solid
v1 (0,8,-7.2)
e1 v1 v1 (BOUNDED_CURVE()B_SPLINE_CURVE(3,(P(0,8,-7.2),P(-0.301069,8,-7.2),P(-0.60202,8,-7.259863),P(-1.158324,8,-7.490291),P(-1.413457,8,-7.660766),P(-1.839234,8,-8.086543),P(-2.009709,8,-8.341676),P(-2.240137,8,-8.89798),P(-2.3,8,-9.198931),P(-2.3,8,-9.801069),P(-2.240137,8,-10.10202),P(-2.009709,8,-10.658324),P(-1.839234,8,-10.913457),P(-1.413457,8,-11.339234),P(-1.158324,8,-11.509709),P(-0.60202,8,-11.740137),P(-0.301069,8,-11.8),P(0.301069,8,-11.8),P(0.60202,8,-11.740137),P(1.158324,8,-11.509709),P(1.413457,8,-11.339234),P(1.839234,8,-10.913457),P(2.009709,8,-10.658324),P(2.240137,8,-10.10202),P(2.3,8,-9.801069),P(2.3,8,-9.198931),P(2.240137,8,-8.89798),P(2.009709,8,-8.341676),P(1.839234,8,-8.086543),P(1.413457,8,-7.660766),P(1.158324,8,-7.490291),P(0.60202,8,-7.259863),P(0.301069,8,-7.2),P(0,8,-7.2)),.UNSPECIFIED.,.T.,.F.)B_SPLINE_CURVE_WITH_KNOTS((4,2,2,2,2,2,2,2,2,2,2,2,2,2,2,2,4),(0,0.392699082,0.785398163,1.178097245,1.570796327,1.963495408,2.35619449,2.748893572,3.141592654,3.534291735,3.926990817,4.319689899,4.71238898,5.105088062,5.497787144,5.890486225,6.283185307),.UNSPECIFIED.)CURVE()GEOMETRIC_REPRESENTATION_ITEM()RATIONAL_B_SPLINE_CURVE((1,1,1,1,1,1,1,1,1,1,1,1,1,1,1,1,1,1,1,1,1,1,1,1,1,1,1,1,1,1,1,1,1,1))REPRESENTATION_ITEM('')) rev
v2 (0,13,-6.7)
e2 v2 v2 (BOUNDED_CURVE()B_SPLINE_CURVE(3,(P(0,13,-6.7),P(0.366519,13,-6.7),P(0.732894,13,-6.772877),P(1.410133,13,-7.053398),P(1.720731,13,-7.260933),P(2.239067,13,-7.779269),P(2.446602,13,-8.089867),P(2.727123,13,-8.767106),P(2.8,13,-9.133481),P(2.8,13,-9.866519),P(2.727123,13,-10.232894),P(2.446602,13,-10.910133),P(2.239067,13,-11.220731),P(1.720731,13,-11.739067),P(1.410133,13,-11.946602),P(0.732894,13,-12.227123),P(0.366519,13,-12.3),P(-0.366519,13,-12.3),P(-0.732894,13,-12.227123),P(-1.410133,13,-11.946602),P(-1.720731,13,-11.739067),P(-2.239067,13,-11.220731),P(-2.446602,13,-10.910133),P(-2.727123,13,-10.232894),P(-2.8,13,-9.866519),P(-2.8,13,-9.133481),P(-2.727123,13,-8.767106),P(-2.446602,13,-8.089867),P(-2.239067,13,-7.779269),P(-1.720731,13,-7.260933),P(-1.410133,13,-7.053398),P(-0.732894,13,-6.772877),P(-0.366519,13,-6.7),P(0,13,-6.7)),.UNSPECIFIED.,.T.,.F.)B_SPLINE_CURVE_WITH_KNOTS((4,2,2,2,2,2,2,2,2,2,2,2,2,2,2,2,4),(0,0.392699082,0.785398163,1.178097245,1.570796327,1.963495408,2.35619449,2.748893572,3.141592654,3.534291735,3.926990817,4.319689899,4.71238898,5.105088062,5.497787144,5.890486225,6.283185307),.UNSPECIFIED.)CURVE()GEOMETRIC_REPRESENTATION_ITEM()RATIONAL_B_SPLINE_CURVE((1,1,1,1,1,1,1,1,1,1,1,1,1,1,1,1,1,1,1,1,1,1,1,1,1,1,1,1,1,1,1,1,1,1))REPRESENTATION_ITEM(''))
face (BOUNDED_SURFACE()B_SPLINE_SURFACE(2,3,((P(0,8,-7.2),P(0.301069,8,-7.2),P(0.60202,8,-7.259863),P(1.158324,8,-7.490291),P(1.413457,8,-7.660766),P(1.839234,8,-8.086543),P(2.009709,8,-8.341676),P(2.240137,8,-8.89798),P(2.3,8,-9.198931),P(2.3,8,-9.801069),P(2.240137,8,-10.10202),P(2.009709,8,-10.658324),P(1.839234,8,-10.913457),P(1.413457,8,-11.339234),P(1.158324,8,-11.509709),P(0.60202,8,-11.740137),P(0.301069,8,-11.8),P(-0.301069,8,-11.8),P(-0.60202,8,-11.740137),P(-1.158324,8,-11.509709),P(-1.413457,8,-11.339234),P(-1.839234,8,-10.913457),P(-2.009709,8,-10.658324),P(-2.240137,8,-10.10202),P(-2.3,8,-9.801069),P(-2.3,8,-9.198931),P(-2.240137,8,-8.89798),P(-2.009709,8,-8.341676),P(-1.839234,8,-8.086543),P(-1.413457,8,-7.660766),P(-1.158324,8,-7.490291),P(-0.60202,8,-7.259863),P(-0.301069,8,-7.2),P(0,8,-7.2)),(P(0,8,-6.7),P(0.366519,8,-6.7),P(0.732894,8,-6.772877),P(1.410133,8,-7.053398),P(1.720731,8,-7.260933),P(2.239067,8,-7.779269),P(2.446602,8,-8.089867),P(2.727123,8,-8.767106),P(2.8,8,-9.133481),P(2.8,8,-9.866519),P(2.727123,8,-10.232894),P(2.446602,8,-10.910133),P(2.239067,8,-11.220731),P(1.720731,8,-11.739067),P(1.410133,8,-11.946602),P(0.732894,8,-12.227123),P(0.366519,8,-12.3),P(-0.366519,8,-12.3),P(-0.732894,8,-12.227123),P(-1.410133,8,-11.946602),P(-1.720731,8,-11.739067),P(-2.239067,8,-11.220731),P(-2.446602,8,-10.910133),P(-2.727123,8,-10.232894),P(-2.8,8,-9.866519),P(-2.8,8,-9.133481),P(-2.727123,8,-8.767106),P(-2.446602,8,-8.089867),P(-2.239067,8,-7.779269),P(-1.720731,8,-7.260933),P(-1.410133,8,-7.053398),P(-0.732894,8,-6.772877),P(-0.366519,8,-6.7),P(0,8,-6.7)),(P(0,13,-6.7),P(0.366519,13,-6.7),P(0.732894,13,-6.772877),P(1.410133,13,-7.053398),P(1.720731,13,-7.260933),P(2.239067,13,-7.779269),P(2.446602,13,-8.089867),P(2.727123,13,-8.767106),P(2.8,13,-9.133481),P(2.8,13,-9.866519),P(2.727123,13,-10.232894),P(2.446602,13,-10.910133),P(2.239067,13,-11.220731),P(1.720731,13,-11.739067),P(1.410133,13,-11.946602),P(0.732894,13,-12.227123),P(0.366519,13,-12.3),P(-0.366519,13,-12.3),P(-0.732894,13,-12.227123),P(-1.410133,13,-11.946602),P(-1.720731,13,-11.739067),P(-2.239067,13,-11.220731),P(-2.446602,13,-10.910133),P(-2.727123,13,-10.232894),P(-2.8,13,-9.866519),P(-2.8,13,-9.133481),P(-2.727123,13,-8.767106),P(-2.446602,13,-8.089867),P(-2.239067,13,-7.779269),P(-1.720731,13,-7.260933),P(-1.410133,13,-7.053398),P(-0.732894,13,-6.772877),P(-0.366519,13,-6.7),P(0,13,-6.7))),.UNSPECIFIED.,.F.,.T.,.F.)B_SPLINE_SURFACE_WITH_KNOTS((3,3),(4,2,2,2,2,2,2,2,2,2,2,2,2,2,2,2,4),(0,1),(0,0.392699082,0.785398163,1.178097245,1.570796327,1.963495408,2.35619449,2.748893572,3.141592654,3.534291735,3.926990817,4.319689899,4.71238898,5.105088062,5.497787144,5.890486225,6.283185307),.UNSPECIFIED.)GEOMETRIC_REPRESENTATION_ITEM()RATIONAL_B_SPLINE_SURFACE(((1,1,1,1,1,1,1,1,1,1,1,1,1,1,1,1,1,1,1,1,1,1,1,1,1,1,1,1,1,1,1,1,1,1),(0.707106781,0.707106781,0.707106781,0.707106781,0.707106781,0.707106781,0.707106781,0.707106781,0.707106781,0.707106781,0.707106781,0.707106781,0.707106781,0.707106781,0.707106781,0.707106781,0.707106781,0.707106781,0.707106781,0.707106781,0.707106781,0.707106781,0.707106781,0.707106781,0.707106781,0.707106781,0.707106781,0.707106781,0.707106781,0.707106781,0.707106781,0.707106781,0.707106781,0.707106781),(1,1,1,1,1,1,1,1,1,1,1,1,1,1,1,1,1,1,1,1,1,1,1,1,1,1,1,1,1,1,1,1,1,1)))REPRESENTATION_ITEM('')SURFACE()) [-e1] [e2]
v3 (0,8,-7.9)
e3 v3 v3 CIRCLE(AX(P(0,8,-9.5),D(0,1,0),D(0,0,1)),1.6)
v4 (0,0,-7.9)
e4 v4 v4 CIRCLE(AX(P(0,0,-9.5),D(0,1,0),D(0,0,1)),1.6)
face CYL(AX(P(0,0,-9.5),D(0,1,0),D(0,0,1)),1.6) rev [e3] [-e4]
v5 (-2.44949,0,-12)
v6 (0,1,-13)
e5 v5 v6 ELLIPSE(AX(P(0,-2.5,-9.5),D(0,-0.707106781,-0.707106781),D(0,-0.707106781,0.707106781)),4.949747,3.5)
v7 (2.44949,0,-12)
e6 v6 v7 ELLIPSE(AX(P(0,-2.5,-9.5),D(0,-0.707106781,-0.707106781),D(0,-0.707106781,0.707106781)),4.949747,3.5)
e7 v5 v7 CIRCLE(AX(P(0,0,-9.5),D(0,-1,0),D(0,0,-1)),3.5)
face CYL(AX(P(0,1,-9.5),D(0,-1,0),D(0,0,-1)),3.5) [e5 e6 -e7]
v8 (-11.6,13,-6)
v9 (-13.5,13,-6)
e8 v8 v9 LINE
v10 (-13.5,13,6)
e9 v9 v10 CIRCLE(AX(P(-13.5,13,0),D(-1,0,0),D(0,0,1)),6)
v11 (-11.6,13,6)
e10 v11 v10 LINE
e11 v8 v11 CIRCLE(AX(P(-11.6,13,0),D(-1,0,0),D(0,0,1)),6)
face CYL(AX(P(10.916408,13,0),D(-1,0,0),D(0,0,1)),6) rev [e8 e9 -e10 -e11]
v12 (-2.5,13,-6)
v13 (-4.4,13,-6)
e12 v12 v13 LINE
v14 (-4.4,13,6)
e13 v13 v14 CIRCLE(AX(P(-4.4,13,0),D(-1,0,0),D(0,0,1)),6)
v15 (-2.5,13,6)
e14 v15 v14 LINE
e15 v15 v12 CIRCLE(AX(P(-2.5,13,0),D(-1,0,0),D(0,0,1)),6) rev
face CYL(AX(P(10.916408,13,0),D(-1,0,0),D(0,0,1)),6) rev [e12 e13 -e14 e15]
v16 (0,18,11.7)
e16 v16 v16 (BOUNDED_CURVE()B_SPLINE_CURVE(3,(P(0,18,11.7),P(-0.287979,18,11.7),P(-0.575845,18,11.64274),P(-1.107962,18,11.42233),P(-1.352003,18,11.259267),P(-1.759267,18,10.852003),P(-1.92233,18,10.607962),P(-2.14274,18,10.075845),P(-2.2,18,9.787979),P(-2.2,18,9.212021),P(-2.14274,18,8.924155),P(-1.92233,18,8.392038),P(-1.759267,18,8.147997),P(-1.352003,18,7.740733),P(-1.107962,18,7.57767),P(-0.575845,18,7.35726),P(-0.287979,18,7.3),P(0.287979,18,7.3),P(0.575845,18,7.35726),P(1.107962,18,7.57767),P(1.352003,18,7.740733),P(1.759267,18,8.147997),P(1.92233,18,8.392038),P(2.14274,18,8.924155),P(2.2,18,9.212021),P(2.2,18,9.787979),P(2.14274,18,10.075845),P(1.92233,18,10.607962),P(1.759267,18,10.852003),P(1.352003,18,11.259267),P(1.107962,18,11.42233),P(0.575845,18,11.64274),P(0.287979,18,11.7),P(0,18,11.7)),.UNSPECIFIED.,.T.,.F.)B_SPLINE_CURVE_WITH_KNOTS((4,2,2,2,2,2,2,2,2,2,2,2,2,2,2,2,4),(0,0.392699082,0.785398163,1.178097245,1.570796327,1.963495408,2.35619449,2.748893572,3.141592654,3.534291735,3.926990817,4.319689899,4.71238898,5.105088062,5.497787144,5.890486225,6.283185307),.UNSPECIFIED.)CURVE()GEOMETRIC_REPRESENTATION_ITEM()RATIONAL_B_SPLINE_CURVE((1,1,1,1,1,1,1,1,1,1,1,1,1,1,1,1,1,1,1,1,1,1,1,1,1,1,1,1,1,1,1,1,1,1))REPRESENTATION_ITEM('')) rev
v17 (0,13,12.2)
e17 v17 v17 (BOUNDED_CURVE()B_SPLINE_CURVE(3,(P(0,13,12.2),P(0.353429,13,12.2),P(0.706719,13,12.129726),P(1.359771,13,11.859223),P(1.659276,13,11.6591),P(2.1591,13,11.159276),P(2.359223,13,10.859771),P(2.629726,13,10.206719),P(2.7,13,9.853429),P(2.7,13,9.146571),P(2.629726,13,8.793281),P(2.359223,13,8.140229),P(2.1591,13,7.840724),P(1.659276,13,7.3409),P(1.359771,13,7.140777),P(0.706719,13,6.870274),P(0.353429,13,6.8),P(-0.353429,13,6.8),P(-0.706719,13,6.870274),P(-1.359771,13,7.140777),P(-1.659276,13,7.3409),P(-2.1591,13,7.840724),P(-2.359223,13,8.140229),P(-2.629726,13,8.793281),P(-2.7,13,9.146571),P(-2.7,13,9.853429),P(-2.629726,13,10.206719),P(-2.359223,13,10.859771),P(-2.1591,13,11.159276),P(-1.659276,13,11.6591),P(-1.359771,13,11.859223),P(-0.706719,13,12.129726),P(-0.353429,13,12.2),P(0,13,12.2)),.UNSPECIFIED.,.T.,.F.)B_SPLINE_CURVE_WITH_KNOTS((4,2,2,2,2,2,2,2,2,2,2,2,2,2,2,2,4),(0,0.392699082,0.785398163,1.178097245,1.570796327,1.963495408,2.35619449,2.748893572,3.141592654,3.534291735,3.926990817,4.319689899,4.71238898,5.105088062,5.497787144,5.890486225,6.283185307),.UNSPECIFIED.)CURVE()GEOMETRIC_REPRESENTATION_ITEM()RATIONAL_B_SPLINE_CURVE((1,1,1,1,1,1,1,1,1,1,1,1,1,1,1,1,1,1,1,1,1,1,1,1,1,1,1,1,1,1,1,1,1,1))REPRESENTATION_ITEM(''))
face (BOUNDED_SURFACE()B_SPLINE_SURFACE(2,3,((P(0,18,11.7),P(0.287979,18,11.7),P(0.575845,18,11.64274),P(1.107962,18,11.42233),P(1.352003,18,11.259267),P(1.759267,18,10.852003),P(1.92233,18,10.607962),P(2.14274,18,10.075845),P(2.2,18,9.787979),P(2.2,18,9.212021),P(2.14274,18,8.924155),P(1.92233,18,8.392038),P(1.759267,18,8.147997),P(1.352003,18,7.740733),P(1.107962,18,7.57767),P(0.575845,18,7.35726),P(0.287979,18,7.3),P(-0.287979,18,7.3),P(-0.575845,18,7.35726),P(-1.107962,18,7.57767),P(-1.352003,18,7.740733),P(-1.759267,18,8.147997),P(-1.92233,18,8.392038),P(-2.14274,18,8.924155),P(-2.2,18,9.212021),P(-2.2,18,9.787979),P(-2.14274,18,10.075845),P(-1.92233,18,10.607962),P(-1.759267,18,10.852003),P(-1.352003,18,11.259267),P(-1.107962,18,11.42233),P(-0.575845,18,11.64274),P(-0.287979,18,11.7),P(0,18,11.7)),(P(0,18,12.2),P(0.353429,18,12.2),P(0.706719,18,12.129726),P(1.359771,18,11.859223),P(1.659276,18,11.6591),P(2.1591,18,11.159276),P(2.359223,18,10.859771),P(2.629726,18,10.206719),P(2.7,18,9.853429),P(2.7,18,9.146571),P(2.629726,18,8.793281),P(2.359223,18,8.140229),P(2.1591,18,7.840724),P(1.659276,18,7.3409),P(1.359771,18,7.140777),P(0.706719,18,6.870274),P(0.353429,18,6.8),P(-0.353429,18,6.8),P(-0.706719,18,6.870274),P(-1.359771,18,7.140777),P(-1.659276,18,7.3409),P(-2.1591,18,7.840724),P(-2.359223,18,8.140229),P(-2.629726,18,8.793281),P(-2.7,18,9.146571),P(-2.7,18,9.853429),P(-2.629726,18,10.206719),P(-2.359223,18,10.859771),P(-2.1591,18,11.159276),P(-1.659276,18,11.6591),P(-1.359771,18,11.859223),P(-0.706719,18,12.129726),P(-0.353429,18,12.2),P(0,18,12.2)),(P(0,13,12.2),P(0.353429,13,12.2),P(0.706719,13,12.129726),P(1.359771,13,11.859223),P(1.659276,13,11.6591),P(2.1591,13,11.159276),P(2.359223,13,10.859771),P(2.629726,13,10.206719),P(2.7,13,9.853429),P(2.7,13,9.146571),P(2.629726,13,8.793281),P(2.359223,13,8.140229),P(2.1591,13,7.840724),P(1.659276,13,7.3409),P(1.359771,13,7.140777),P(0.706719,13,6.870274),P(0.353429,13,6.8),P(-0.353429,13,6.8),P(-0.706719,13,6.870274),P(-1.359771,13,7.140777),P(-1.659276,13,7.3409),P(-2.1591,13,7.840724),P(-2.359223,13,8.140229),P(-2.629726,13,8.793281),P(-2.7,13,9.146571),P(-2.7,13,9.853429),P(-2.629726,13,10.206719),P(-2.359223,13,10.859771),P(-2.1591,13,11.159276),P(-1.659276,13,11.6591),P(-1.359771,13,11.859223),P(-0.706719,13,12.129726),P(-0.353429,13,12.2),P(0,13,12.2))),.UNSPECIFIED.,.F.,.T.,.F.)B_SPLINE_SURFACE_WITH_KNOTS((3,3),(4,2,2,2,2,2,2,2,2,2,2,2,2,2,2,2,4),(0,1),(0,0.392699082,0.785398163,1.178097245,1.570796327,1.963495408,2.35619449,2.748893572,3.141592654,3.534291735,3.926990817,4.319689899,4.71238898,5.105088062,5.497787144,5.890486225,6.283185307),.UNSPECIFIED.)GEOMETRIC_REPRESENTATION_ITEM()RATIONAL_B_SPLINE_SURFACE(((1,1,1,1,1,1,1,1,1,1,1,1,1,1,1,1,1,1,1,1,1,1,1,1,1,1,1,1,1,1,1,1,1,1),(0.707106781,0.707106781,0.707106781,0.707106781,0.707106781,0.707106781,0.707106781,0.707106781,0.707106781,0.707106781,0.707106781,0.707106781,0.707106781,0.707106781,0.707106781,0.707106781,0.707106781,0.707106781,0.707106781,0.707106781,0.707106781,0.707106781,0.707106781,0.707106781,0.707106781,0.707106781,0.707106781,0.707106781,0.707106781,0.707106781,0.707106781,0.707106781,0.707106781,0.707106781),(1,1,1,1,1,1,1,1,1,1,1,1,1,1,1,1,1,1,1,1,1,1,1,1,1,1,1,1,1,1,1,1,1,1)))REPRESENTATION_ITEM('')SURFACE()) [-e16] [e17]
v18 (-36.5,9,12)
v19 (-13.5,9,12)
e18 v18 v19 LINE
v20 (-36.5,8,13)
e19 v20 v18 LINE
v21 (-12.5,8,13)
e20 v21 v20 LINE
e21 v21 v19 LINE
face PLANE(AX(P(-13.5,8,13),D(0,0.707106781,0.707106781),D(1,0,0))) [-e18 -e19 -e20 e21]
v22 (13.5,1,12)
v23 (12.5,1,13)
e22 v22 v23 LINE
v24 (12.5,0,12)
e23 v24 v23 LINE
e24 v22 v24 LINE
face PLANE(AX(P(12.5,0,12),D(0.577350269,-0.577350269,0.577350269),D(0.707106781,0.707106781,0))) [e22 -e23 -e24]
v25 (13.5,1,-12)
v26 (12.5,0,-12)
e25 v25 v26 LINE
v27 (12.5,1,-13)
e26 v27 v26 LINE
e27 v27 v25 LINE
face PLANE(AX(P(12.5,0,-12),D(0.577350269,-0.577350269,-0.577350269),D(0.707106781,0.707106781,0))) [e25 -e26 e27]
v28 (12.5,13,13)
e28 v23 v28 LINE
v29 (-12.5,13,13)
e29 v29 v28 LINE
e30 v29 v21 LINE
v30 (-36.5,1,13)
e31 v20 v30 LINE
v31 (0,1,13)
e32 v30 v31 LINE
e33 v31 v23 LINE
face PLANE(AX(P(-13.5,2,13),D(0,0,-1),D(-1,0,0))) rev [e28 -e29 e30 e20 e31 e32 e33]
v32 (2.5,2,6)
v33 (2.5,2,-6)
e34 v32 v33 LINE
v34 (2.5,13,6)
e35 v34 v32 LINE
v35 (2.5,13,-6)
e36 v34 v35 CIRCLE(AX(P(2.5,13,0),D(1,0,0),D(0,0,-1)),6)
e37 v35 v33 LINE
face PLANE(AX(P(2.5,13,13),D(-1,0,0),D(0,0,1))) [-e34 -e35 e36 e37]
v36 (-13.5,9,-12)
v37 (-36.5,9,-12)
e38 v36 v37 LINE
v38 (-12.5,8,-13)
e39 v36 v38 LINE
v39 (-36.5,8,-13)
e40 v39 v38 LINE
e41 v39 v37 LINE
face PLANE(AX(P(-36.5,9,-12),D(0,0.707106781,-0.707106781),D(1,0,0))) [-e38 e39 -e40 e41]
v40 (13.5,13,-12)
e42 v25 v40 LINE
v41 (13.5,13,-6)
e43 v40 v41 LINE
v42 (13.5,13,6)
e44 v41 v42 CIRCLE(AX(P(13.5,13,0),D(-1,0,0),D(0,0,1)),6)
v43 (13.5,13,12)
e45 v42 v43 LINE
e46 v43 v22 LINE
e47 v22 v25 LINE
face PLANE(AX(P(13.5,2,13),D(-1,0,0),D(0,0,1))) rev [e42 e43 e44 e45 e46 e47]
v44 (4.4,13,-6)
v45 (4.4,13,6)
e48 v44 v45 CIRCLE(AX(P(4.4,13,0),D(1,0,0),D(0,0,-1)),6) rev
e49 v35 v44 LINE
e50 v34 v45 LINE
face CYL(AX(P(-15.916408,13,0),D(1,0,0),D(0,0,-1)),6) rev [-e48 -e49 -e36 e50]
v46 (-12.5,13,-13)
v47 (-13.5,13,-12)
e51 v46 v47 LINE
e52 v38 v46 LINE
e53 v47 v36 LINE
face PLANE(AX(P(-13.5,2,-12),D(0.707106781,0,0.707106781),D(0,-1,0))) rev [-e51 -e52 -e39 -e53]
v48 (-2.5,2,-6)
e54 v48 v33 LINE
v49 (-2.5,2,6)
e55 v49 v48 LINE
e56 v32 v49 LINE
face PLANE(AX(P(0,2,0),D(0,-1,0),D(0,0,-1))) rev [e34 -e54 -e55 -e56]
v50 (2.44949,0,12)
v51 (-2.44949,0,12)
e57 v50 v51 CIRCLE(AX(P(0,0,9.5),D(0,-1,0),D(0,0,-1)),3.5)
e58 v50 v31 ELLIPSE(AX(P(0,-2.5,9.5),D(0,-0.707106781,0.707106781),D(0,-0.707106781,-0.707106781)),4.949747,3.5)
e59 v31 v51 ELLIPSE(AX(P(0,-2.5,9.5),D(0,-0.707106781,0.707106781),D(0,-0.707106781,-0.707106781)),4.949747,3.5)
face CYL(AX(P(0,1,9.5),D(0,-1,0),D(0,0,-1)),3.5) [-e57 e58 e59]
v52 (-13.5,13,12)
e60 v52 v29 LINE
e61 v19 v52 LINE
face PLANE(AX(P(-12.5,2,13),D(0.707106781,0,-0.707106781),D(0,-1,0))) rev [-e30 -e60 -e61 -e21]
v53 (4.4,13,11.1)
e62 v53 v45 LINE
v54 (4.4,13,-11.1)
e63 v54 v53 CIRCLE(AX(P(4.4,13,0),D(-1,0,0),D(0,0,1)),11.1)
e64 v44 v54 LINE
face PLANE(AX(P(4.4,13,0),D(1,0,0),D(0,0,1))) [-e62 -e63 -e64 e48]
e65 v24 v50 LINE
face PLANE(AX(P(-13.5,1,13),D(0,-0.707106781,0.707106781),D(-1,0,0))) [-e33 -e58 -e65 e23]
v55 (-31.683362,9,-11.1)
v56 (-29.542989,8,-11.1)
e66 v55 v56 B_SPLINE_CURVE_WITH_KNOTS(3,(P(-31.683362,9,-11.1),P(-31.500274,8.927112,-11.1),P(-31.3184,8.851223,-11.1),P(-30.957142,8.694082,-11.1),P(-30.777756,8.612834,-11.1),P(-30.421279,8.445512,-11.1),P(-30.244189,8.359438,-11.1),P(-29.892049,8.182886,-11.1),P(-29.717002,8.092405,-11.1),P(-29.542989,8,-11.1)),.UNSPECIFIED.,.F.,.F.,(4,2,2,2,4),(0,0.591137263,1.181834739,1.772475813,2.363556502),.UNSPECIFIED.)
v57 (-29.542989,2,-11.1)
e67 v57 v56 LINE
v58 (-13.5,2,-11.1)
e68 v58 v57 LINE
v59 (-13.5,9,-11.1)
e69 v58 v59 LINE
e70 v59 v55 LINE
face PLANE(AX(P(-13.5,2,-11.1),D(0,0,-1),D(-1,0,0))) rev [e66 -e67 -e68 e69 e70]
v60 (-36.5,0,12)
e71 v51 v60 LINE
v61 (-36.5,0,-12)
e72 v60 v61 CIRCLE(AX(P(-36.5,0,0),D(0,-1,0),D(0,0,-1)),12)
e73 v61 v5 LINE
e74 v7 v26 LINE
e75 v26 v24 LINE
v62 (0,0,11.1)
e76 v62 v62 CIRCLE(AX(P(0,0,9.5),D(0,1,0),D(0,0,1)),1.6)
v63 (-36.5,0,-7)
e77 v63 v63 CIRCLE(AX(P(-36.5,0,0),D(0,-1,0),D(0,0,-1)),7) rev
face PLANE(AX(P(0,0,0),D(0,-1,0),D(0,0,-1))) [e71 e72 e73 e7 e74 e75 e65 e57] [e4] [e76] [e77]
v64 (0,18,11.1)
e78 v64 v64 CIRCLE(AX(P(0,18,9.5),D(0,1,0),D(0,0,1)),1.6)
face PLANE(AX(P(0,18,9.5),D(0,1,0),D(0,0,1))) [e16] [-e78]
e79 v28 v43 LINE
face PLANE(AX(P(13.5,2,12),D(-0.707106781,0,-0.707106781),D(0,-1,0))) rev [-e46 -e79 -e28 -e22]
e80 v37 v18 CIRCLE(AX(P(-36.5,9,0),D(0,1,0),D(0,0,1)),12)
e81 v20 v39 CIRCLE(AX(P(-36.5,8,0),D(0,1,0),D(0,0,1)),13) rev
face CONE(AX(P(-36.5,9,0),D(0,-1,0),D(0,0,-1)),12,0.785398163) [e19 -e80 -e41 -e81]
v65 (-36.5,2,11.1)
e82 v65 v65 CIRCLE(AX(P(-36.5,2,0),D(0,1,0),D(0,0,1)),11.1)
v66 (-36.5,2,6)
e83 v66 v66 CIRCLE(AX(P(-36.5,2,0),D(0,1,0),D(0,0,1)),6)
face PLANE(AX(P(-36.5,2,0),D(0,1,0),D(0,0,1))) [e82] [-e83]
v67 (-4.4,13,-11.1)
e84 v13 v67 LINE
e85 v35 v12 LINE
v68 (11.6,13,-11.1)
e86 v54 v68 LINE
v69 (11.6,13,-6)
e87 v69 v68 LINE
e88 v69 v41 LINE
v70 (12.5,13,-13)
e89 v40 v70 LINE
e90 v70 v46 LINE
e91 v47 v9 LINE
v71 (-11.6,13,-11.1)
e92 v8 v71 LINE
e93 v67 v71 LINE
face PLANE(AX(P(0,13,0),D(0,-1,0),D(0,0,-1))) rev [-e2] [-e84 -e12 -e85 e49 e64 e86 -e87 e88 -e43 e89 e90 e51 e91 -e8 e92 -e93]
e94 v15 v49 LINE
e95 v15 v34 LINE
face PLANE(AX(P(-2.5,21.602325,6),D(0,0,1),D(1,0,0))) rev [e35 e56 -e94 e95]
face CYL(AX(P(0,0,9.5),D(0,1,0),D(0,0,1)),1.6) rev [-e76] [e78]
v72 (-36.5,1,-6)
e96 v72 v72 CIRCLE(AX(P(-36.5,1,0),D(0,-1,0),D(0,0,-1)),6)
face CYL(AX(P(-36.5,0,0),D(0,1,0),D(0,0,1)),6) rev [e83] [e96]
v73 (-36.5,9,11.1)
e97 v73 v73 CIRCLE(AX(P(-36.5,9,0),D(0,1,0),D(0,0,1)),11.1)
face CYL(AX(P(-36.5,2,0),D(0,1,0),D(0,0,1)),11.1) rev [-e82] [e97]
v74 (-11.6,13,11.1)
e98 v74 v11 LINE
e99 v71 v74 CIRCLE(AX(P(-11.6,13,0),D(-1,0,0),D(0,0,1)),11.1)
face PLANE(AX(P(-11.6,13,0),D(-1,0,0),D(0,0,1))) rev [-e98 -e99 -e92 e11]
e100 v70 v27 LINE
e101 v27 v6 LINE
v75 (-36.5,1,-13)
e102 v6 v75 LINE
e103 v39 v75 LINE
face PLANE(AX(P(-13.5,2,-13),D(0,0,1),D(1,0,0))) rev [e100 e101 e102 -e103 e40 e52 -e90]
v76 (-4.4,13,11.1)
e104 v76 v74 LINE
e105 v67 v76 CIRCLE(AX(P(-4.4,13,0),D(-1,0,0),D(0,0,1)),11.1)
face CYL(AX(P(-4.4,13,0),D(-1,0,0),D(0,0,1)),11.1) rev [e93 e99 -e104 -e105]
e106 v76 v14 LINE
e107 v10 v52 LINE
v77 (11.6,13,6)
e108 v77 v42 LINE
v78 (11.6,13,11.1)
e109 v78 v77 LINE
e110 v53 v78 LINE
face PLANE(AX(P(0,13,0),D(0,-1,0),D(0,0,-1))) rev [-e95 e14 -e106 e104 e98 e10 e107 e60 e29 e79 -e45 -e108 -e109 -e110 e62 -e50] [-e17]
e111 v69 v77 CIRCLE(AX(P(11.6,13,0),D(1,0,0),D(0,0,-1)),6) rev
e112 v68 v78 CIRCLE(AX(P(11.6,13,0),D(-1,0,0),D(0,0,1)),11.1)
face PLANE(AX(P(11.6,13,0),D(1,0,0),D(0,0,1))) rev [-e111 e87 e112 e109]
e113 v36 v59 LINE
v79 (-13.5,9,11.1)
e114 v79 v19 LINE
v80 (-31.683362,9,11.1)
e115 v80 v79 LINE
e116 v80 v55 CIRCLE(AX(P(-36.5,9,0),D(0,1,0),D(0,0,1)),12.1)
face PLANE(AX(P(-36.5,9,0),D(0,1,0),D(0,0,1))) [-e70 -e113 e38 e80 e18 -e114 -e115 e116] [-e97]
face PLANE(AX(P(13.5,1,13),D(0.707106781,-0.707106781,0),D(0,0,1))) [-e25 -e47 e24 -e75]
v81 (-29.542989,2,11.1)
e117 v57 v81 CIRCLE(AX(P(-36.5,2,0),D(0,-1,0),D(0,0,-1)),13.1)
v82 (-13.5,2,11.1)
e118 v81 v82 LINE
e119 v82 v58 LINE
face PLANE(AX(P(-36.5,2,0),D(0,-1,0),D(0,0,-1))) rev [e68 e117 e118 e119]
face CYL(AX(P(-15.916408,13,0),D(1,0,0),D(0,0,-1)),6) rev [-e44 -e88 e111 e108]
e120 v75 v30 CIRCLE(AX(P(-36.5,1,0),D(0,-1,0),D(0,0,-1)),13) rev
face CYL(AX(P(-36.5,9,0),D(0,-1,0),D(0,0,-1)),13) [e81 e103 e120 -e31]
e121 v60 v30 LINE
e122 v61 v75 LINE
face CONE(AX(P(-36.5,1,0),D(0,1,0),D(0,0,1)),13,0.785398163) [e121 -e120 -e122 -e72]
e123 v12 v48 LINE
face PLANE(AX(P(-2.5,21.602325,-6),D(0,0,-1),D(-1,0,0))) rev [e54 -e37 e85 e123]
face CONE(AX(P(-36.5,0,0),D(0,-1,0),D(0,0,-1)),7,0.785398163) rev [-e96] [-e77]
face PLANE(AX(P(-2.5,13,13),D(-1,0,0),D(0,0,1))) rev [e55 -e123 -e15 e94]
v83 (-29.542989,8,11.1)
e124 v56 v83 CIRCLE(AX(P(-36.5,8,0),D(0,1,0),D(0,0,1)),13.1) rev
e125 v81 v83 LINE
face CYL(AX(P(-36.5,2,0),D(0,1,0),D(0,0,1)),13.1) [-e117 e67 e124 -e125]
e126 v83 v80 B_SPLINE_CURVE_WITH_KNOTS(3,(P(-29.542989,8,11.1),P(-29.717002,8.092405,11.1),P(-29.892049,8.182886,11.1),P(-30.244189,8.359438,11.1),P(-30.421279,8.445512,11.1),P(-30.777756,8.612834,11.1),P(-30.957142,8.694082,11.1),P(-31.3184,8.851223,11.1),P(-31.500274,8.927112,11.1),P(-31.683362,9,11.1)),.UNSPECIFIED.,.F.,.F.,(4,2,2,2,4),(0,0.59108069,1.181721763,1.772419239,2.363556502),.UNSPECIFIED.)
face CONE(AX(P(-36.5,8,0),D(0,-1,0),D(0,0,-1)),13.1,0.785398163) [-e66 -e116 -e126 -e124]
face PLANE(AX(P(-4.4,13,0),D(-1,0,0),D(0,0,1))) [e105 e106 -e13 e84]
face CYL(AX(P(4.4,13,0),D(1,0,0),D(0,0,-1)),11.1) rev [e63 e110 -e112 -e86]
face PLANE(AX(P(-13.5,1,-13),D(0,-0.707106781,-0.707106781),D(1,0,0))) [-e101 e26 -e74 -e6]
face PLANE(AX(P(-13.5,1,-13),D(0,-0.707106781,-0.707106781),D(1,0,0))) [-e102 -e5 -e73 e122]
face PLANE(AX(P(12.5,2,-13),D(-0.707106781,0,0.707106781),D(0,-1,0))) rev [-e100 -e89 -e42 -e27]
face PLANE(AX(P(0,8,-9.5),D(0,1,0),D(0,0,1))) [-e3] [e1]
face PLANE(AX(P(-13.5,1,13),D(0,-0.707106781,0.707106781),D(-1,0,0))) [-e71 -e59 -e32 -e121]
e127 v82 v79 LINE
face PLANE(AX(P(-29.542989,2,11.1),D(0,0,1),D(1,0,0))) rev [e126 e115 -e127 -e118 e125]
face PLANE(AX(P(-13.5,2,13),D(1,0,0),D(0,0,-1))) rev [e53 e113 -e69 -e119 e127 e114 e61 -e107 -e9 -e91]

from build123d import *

# Parameters (mm, degrees)
SKETCH1_W           = 27
SKETCH1_H           = 26
BOSS_EXTRUDE1_DEPTH = 2
SKETCH2_W           = 11
SKETCH2_H           = 26
BOSS_EXTRUDE2_DEPTH = 11
CUT_EXTRUDE1_DEPTH  = 3.6
CUT_EXTRUDE2_REACH  = 34.665
SKETCH13_W          = 5
SKETCH13_H          = 7
BOSS_EXTRUDE6_DEPTH = 11
SKETCH14_R          = 2.7
BOSS_EXTRUDE7_DEPTH = 5
SKETCH15_R          = 2.8
CUT_EXTRUDE7_DEPTH  = 5
SKETCH16_R          = 1.6
CUT_EXTRUDE8_DEPTH  = 26.98557292
BOSS_EXTRUDE5_DEPTH = 9
SKETCH10_R          = 11.1
CUT_EXTRUDE4_DEPTH  = 7
SKETCH11_R          = 6
CUT_EXTRUDE5_DEPTH  = 54.621357685
CUT_EXTRUDE6_DEPTH  = 7
BOSS_EXTRUDE9_START = -1
SKETCH17_R          = 3.5
SKETCH17_R_2        = 1.6
BOSS_EXTRUDE9_DEPTH = 1
FILLET1_SIZE        = 5
FILLET1_SIZE_2      = 0.5


with BuildPart() as part:
    # Sketch1 → Boss-Extrude1 (new body)
    with BuildSketch(Plane(origin=(0, 0, 0), x_dir=(1, 0, 0), z_dir=(0, 1, 0))):
        Rectangle(SKETCH1_W, SKETCH1_H)
    extrude(amount=BOSS_EXTRUDE1_DEPTH)

    # Sketch2 → Boss-Extrude2 (add)
    with BuildSketch(Plane(origin=(0, 2, 0), x_dir=(1, 0, 0), z_dir=(0, 1, 0))):
        with Locations((-8, 0)):
            Rectangle(SKETCH2_W, SKETCH2_H)
    boss_extrude2 = extrude(amount=BOSS_EXTRUDE2_DEPTH)

    # Sketch3 → Cut-Extrude1 (cut, symmetric)
    with BuildSketch(Plane.ZY.offset(8)):
        with BuildLine():
            Line((11.1, 13), (-11.1, 13))
            ThreePointArc((-11.1, 13), (0, 1.9), (11.1, 13))
        make_face()
    cut_extrude1 = extrude(amount=CUT_EXTRUDE1_DEPTH, both=True, mode=Mode.SUBTRACT)

    # Cut-Extrude2: up to this face of the body (flat: up to its plane)
    cut_extrude2_end = Plane(part.part.faces().sort_by_distance((-2.5, 7.5, 0))[0])
    # Sketch4 → Cut-Extrude2 (cut, up to the picked face)
    with BuildSketch(Plane.ZY.offset(13.5), mode=Mode.PRIVATE) as cut_extrude2_sk1:
        with BuildLine():
            Line((6, 13), (-6, 13))
            ThreePointArc((-6, 13), (0, 7), (6, 13))
        make_face()
    cut_extrude2_tool1 = split(extrude(cut_extrude2_sk1.sketch, amount=-CUT_EXTRUDE2_REACH, mode=Mode.PRIVATE), bisect_by=cut_extrude2_end, keep=Keep.BOTH, mode=Mode.PRIVATE)
    cut_extrude2 = cut_extrude2_tool1.solids().sort_by(Axis((-13.5, 10.453521, 0), (1, 0, 0)))[0]
    add(cut_extrude2, mode=Mode.SUBTRACT)

    # Mirror3: Boss-Extrude2, Cut-Extrude1, Cut-Extrude2 across plane
    add(boss_extrude2.mirror(Plane(origin=(0, 0, 0), x_dir=(0, 0, 1), z_dir=(1, 0, 0))))
    add(cut_extrude1.mirror(Plane(origin=(0, 0, 0), x_dir=(0, 0, 1), z_dir=(1, 0, 0))), mode=Mode.SUBTRACT)
    add(cut_extrude2.mirror(Plane(origin=(0, 0, 0), x_dir=(0, 0, 1), z_dir=(1, 0, 0))), mode=Mode.SUBTRACT)

    # Sketch13 → Boss-Extrude6 (add)
    with BuildSketch(Plane(origin=(0, 2, 0), x_dir=(1, 0, 0), z_dir=(0, 1, 0))):
        with Locations((0, -9.5)):
            Rectangle(SKETCH13_W, SKETCH13_H)
        with Locations((0, 9.5)):
            Rectangle(SKETCH13_W, SKETCH13_H)
    extrude(amount=BOSS_EXTRUDE6_DEPTH)

    # Sketch14 → Boss-Extrude7 (add)
    with BuildSketch(Plane(origin=(0, 13, 0), x_dir=(1, 0, 0), z_dir=(0, 1, 0))):
        with Locations(Location((0, -9.5, 0), (0, 0, 90))):
            Circle(SKETCH14_R)
    extrude(amount=BOSS_EXTRUDE7_DEPTH)

    # Sketch15 → Cut-Extrude7 (cut)
    with BuildSketch(Plane(origin=(0, 13, 0), x_dir=(1, 0, 0), z_dir=(0, 1, 0))):
        with Locations(Location((0, 9.5, 0), (0, 0, 270))):
            Circle(SKETCH15_R)
    extrude(amount=-CUT_EXTRUDE7_DEPTH, mode=Mode.SUBTRACT)

    # Sketch16 → Cut-Extrude8 (cut, through all)
    with BuildSketch(Plane(origin=(0, 18, 0), x_dir=(1, 0, 0), z_dir=(0, 1, 0))):
        with Locations(Location((0, -9.5, 0), (0, 0, 270))):
            Circle(SKETCH16_R)
        with Locations(Location((0, 9.5, 0), (0, 0, 270))):
            Circle(SKETCH16_R)
    extrude(amount=-CUT_EXTRUDE8_DEPTH, mode=Mode.SUBTRACT)

    # Sketch9 → Boss-Extrude5 (add)
    with BuildSketch(Plane(origin=(0, 0, 0), x_dir=(1, 0, 0), z_dir=(0, 1, 0))):
        with BuildLine():
            Line((-13.5, 13), (-13.5, -13))
            Line((-13.5, -13), (-36.5, -13))
            ThreePointArc((-36.5, -13), (-49.5, 0), (-36.5, 13))
            Line((-36.5, 13), (-13.5, 13))
        make_face()
    extrude(amount=BOSS_EXTRUDE5_DEPTH)

    # Sketch10 → Cut-Extrude4 (cut)
    with BuildSketch(Plane(origin=(0, 9, 0), x_dir=(1, 0, 0), z_dir=(0, 1, 0))):
        with Locations(Location((-36.5, 0, 0), (0, 0, 270))):
            Circle(SKETCH10_R)
    extrude(amount=-CUT_EXTRUDE4_DEPTH, mode=Mode.SUBTRACT)

    # Sketch11 → Cut-Extrude5 (cut, through all)
    with BuildSketch(Plane(origin=(0, 2, 0), x_dir=(1, 0, 0), z_dir=(0, 1, 0))):
        with Locations(Location((-36.5, 0, 0), (0, 0, 270))):
            Circle(SKETCH11_R)
    extrude(amount=-CUT_EXTRUDE5_DEPTH, mode=Mode.SUBTRACT)

    # Sketch12 → Cut-Extrude6 (cut)
    with BuildSketch(Plane(origin=(0, 9, 0), x_dir=(1, 0, 0), z_dir=(0, 1, 0))):
        with BuildLine():
            Line((-29.542989148, -11.1), (-13.5, -11.1))
            Line((-13.5, -11.1), (-13.5, 11.1))
            Line((-13.5, 11.1), (-29.542989148, 11.1))
            ThreePointArc((-29.542989148, 11.1), (-23.4, 0), (-29.542989148, -11.1))
        make_face()
    extrude(amount=-CUT_EXTRUDE6_DEPTH, mode=Mode.SUBTRACT)

    # Chamfer4
    # the kernel refuses this chamfer: 1 mm, written as the material it takes off along each edge
    with BuildSketch(Plane(origin=(12.833333333, 0.666666667, 12.333333333), x_dir=(0.7071067811865475, 0, -0.7071067811865475), z_dir=(0.5773502691896257, -0.5773502691896258, 0.5773502691896257)), Plane(origin=(12.833333333, 0.666666667, -12.333333333), x_dir=(-0.7071067811865475, 0, -0.7071067811865475), z_dir=(0.5773502691896257, -0.5773502691896258, -0.5773502691896257))) as chamfer4_piece_1:
        Polygon((-0.707106781, 0.40824829), (0.707106781, 0.40824829), (0, -0.816496581), align=None)
    extrude(amount=1.270170592, mode=Mode.SUBTRACT)
    with BuildSketch(Plane(origin=(-36.5, 0, 0), x_dir=(0, 0, 1), z_dir=(1, 0, 0))) as chamfer4_piece_2:
        with BuildLine():
            Line((13.028284271, -1.028284271), (11.971715729, 0.028284271))
            Line((11.971715729, 0.028284271), (11.971715729, 0.048284271))
            ThreePointArc((11.971715729, 0.048284271), (12.485857864, 0.02), (13, 0.02))
            Line((13, 0.02), (13.02, 0))
            ThreePointArc((13.02, 0), (13.02, -0.514142136), (13.048284271, -1.028284271))
            Line((13.048284271, -1.028284271), (13.028284271, -1.028284271))
        make_face()
    revolve(axis=Axis((-36.5, 0, 0), (0, -1, 0)), revolution_arc=180, mode=Mode.SUBTRACT)
    with BuildSketch(Plane(origin=(-13.5, 9, 13), x_dir=(0, -0.9996219169112968, 0.027495876610585623), z_dir=(-1, 0, 0))) as chamfer4_piece_3:
        with BuildLine():
            Line((1.028673195, 0), (-0.056547155, -1.027117794))
            Line((-0.056547155, -1.027117794), (-0.076539593, -1.026567876))
            ThreePointArc((-0.076539593, -1.026567876), (-0.034129227, -0.51339783), (-0.019992438, 0.000549918))
            Line((-0.019992438, 0.000549918), (0.000549918, 0.019992438))
            ThreePointArc((0.000549918, 0.019992438), (0.514497665, 0.00585565), (1.029223113, 0.019992438))
            Line((1.029223113, 0.019992438), (1.028673195, 0))
        make_face()
    extrude(amount=23, mode=Mode.SUBTRACT)
    with BuildSketch(Plane(origin=(-36.5, 9, -13), x_dir=(0, 0.027495876610585647, 0.9996219169112968), z_dir=(1, 0, 0))) as chamfer4_piece_4:
        with BuildLine():
            Line((1.028673195, 0), (-0.056547155, 1.027117794))
            Line((-0.056547155, 1.027117794), (-0.076539593, 1.026567876))
            ThreePointArc((-0.076539593, 1.026567876), (-0.034129227, 0.51339783), (-0.019992438, -0.000549918))
            Line((-0.019992438, -0.000549918), (0.000549918, -0.019992438))
            ThreePointArc((0.000549918, -0.019992438), (0.514497665, -0.00585565), (1.029223113, -0.019992438))
            Line((1.029223113, -0.019992438), (1.028673195, 0))
        make_face()
    extrude(amount=23, mode=Mode.SUBTRACT)
    with BuildSketch(Plane(origin=(-36.5, 9, 0), x_dir=(0, 0, 1), z_dir=(1, 0, 0))) as chamfer4_piece_5:
        with BuildLine():
            Line((11.971715729, -0.028284271), (13.028284271, 1.028284271))
            Line((13.028284271, 1.028284271), (13.048284271, 1.028284271))
            ThreePointArc((13.048284271, 1.028284271), (13.02, 0.514142136), (13.02, 0))
            Line((13.02, 0), (13, -0.02))
            ThreePointArc((13, -0.02), (12.485857864, -0.02), (11.971715729, -0.048284271))
            Line((11.971715729, -0.048284271), (11.971715729, -0.028284271))
        make_face()
    revolve(axis=Axis((-36.5, 9, 0), (0, -1, 0)), revolution_arc=180, mode=Mode.SUBTRACT)
    with BuildSketch(Plane(origin=(-36.5, 0, 0), x_dir=(0, 0, 1), z_dir=(-1, 0, 0))) as chamfer4_piece_6:
        with BuildLine():
            Line((5.971715729, 1.028284271), (7.028284271, -0.028284271))
            Line((7.028284271, -0.028284271), (7.028284271, -0.048284271))
            ThreePointArc((7.028284271, -0.048284271), (6.514142136, -0.02), (6, -0.02))
            Line((6, -0.02), (5.98, 0))
            ThreePointArc((5.98, 0), (5.98, 0.514142136), (5.951715729, 1.028284271))
            Line((5.951715729, 1.028284271), (5.971715729, 1.028284271))
        make_face()
    revolve(axis=Axis((-36.5, 0, 0), (0, 1, 0)), mode=Mode.SUBTRACT)
    with BuildSketch(Plane(origin=(-36.5, 9, 0), x_dir=(0.35547288647586206, 0, -0.934686592917925), z_dir=(-0.934686592917925, 0, -0.35547288647586206))) as chamfer4_piece_7_section:
        with BuildLine():
            Line((12.071715729, -0.028284271), (13.128284271, 1.028284271))
            Line((13.128284271, 1.028284271), (13.148284271, 1.028284271))
            ThreePointArc((13.148284271, 1.028284271), (13.12, 0.514142136), (13.12, 0))
            Line((13.12, 0), (13.1, -0.02))
            ThreePointArc((13.1, -0.02), (12.585857864, -0.02), (12.071715729, -0.048284271))
            Line((12.071715729, -0.048284271), (12.071715729, -0.028284271))
        make_face()
    chamfer4_piece_7 = revolve(axis=Axis((-36.5, 9, 0), (0, -1, 0)), revolution_arc=138.355141446, mode=Mode.PRIVATE)
    chamfer4_piece_7 = split(chamfer4_piece_7, bisect_by=Plane(origin=(-23.882630436, 8.517369564, -11.1), z_dir=(0, 0, 1)), keep=Keep.TOP, mode=Mode.PRIVATE)
    chamfer4_piece_7 = split(chamfer4_piece_7, bisect_by=Plane(origin=(-23.882630436, 8.517369564, 11.1), z_dir=(0, 0, -1)), keep=Keep.TOP, mode=Mode.PRIVATE)
    add(chamfer4_piece_7, mode=Mode.SUBTRACT)
    with BuildSketch(Plane(origin=(-36.5, 0, 13), x_dir=(0, 0.999621916911297, 0.02749587661058045), z_dir=(1, 0, 0))) as chamfer4_piece_8:
        with BuildLine():
            Line((1.028673195, 0), (-0.056547155, -1.027117794))
            Line((-0.056547155, -1.027117794), (-0.076539593, -1.026567876))
            ThreePointArc((-0.076539593, -1.026567876), (-0.034129227, -0.51339783), (-0.019992438, 0.000549918))
            Line((-0.019992438, 0.000549918), (0.000549918, 0.019992438))
            ThreePointArc((0.000549918, 0.019992438), (0.514497665, 0.00585565), (1.029223113, 0.019992438))
            Line((1.029223113, 0.019992438), (1.028673195, 0))
        make_face()
    extrude(amount=52.571682988, mode=Mode.SUBTRACT)
    with BuildSketch(Plane(origin=(-36.5, 0, -13), x_dir=(0, 0.9996219169112965, -0.027495876610590803), z_dir=(1, 0, 0))) as chamfer4_piece_9:
        with BuildLine():
            Line((1.028673195, 0), (-0.056547155, 1.027117794))
            Line((-0.056547155, 1.027117794), (-0.076539593, 1.026567876))
            ThreePointArc((-0.076539593, 1.026567876), (-0.034129227, 0.51339783), (-0.019992438, -0.000549918))
            Line((-0.019992438, -0.000549918), (0.000549918, -0.019992438))
            ThreePointArc((0.000549918, -0.019992438), (0.514497665, -0.00585565), (1.029223113, -0.019992438))
            Line((1.029223113, -0.019992438), (1.028673195, 0))
        make_face()
    extrude(amount=52.571682988, mode=Mode.SUBTRACT)
    with BuildSketch(Plane(origin=(13.5, 0, 15.571682988), x_dir=(-0.9996219169112968, -0.02749587661058639, 0), z_dir=(0, 0, -1))) as chamfer4_piece_10:
        with BuildLine():
            Line((1.028673195, 0), (-0.056547155, 1.027117794))
            Line((-0.056547155, 1.027117794), (-0.076539593, 1.026567876))
            ThreePointArc((-0.076539593, 1.026567876), (-0.034129227, 0.51339783), (-0.019992438, -0.000549918))
            Line((-0.019992438, -0.000549918), (0.000549918, -0.019992438))
            ThreePointArc((0.000549918, -0.019992438), (0.514497665, -0.00585565), (1.029223113, -0.019992438))
            Line((1.029223113, -0.019992438), (1.028673195, 0))
        make_face()
    extrude(amount=31.143365976, mode=Mode.SUBTRACT)
    with BuildSketch(Plane(origin=(13.5, -2.571682988, 13), x_dir=(-0.9996219169112968, 0, 0.027495876610585647), z_dir=(0, 1, 0))) as chamfer4_piece_11:
        with BuildLine():
            Line((1.028673195, 0), (-0.056547155, -1.027117794))
            Line((-0.056547155, -1.027117794), (-0.076539593, -1.026567876))
            ThreePointArc((-0.076539593, -1.026567876), (-0.034129227, -0.51339783), (-0.019992438, 0.000549918))
            Line((-0.019992438, 0.000549918), (0.000549918, 0.019992438))
            ThreePointArc((0.000549918, 0.019992438), (0.514497665, 0.00585565), (1.029223113, 0.019992438))
            Line((1.029223113, 0.019992438), (1.028673195, 0))
        make_face()
    extrude(amount=18.143365976, mode=Mode.SUBTRACT)
    with BuildSketch(Plane(origin=(-13.5, 15.571682988, 13), x_dir=(0.9996219169112968, 0, 0.027495876610585647), z_dir=(0, -1, 0))) as chamfer4_piece_12:
        with BuildLine():
            Line((1.028673195, 0), (-0.056547155, -1.027117794))
            Line((-0.056547155, -1.027117794), (-0.076539593, -1.026567876))
            ThreePointArc((-0.076539593, -1.026567876), (-0.034129227, -0.51339783), (-0.019992438, 0.000549918))
            Line((-0.019992438, 0.000549918), (0.000549918, 0.019992438))
            ThreePointArc((0.000549918, 0.019992438), (0.514497665, 0.00585565), (1.029223113, 0.019992438))
            Line((1.029223113, 0.019992438), (1.028673195, 0))
        make_face()
    extrude(amount=6.571682988, mode=Mode.SUBTRACT)
    with BuildSketch(Plane(origin=(-13.5, 15.571682988, -13), x_dir=(0.9996219169112968, 0, -0.027495876610585647), z_dir=(0, -1, 0))) as chamfer4_piece_13:
        with BuildLine():
            Line((1.028673195, 0), (-0.056547155, 1.027117794))
            Line((-0.056547155, 1.027117794), (-0.076539593, 1.026567876))
            ThreePointArc((-0.076539593, 1.026567876), (-0.034129227, 0.51339783), (-0.019992438, -0.000549918))
            Line((-0.019992438, -0.000549918), (0.000549918, -0.019992438))
            ThreePointArc((0.000549918, -0.019992438), (0.514497665, -0.00585565), (1.029223113, -0.019992438))
            Line((1.029223113, -0.019992438), (1.028673195, 0))
        make_face()
    extrude(amount=6.571682988, mode=Mode.SUBTRACT)
    with BuildSketch(Plane(origin=(13.5, -2.571682988, -13), x_dir=(-0.9996219169112968, 0, -0.027495876610585647), z_dir=(0, 1, 0))) as chamfer4_piece_14:
        with BuildLine():
            Line((1.028673195, 0), (-0.056547155, 1.027117794))
            Line((-0.056547155, 1.027117794), (-0.076539593, 1.026567876))
            ThreePointArc((-0.076539593, 1.026567876), (-0.034129227, 0.51339783), (-0.019992438, -0.000549918))
            Line((-0.019992438, -0.000549918), (0.000549918, -0.019992438))
            ThreePointArc((0.000549918, -0.019992438), (0.514497665, -0.00585565), (1.029223113, -0.019992438))
            Line((1.029223113, -0.019992438), (1.028673195, 0))
        make_face()
    extrude(amount=18.143365976, mode=Mode.SUBTRACT)
    with BuildSketch(Plane(origin=(-13.5, 15.571682988, 13), x_dir=(0.9996219169112968, 0, 0.027495876610585647), z_dir=(0, -1, 0))) as chamfer4_piece_15a_section:
        with BuildLine():
            Line((1.028673195, 0), (-0.056547155, -1.027117794))
            Line((-0.056547155, -1.027117794), (-0.076539593, -1.026567876))
            ThreePointArc((-0.076539593, -1.026567876), (-0.034129227, -0.51339783), (-0.019992438, 0.000549918))
            Line((-0.019992438, 0.000549918), (0.000549918, 0.019992438))
            ThreePointArc((0.000549918, 0.019992438), (0.514497665, 0.00585565), (1.029223113, 0.019992438))
            Line((1.029223113, 0.019992438), (1.028673195, 0))
        make_face()
    chamfer4_piece_15a = extrude(amount=9.143365976, mode=Mode.PRIVATE)
    chamfer4_piece_15a = split(chamfer4_piece_15a, bisect_by=Plane(origin=(-13.170206373, 9, 12.670206373), z_dir=(0, -1, 0)), keep=Keep.TOP, mode=Mode.PRIVATE)
    with BuildSketch(Plane(origin=(-10.928317012, 9, 13), x_dir=(0, -0.9996219169112968, 0.027495876610585623), z_dir=(-1, 0, 0))) as chamfer4_piece_15b_section:
        with BuildLine():
            Line((1.028673195, 0), (-0.056547155, -1.027117794))
            Line((-0.056547155, -1.027117794), (-0.076539593, -1.026567876))
            ThreePointArc((-0.076539593, -1.026567876), (-0.034129227, -0.51339783), (-0.019992438, 0.000549918))
            Line((-0.019992438, 0.000549918), (0.000549918, 0.019992438))
            ThreePointArc((0.000549918, 0.019992438), (0.514497665, 0.00585565), (1.029223113, 0.019992438))
            Line((1.029223113, 0.019992438), (1.028673195, 0))
        make_face()
    chamfer4_piece_15b = extrude(amount=25.571682988, mode=Mode.PRIVATE)
    chamfer4_piece_15b = split(chamfer4_piece_15b, bisect_by=Plane(origin=(-13.5, 8.670206373, 12.670206373), z_dir=(1, 0, 0)), keep=Keep.TOP, mode=Mode.PRIVATE)
    chamfer4_piece_15 = chamfer4_piece_15a & chamfer4_piece_15b
    add(chamfer4_piece_15, mode=Mode.SUBTRACT)
    with BuildSketch(Plane(origin=(-36.5, 9, -13), x_dir=(0, 0.027495876610585647, 0.9996219169112968), z_dir=(1, 0, 0))) as chamfer4_piece_16a_section:
        with BuildLine():
            Line((1.028673195, 0), (-0.056547155, 1.027117794))
            Line((-0.056547155, 1.027117794), (-0.076539593, 1.026567876))
            ThreePointArc((-0.076539593, 1.026567876), (-0.034129227, 0.51339783), (-0.019992438, -0.000549918))
            Line((-0.019992438, -0.000549918), (0.000549918, -0.019992438))
            ThreePointArc((0.000549918, -0.019992438), (0.514497665, -0.00585565), (1.029223113, -0.019992438))
            Line((1.029223113, -0.019992438), (1.028673195, 0))
        make_face()
    chamfer4_piece_16a = extrude(amount=25.571682988, mode=Mode.PRIVATE)
    chamfer4_piece_16a = split(chamfer4_piece_16a, bisect_by=Plane(origin=(-13.5, 8.670206373, -12.670206373), z_dir=(1, 0, 0)), keep=Keep.TOP, mode=Mode.PRIVATE)
    with BuildSketch(Plane(origin=(-13.5, 15.571682988, -13), x_dir=(0.9996219169112968, 0, -0.027495876610585647), z_dir=(0, -1, 0))) as chamfer4_piece_16b_section:
        with BuildLine():
            Line((1.028673195, 0), (-0.056547155, 1.027117794))
            Line((-0.056547155, 1.027117794), (-0.076539593, 1.026567876))
            ThreePointArc((-0.076539593, 1.026567876), (-0.034129227, 0.51339783), (-0.019992438, -0.000549918))
            Line((-0.019992438, -0.000549918), (0.000549918, -0.019992438))
            ThreePointArc((0.000549918, -0.019992438), (0.514497665, -0.00585565), (1.029223113, -0.019992438))
            Line((1.029223113, -0.019992438), (1.028673195, 0))
        make_face()
    chamfer4_piece_16b = extrude(amount=9.143365976, mode=Mode.PRIVATE)
    chamfer4_piece_16b = split(chamfer4_piece_16b, bisect_by=Plane(origin=(-13.170206373, 9, -12.670206373), z_dir=(0, -1, 0)), keep=Keep.TOP, mode=Mode.PRIVATE)
    chamfer4_piece_16 = chamfer4_piece_16a & chamfer4_piece_16b
    add(chamfer4_piece_16, mode=Mode.SUBTRACT)

    # Sketch17 → Boss-Extrude9 (add)
    # profile 1 of 2: a face of its own
    with BuildSketch(Plane.XZ.offset(BOSS_EXTRUDE9_START)):
        with Locations((0, -9.5)):
            Circle(SKETCH17_R)
        with Locations(Location((0, -9.5, 0), (0, 0, 90))):
            Circle(SKETCH17_R_2, mode=Mode.SUBTRACT)
    # profile 2 of 2: a face of its own
    with BuildSketch(Plane.XZ.offset(BOSS_EXTRUDE9_START)):
        with Locations((0, 9.5)):
            Circle(SKETCH17_R)
        with Locations(Location((0, 9.5, 0), (0, 0, 90))):
            Circle(SKETCH17_R_2, mode=Mode.SUBTRACT)
    extrude(amount=BOSS_EXTRUDE9_DEPTH)

    # Fillet1
    # an asymmetric fillet: 5, 0.5 mm, written as the material it adds along each edge
    with BuildSketch(Plane(origin=(0, 8, -9.5), x_dir=(0, 0, 1), z_dir=(-1, 0, 0))) as fillet1_piece_1:
        with BuildLine():
            Bezier((2.8, FILLET1_SIZE), (2.8, 0), (2.8 - FILLET1_SIZE_2, 0), weights=[1, 0.707106781, 1])
            Line((2.8 - FILLET1_SIZE_2, 0), (2.8, 0))
            Line((2.8, 0), (2.8, FILLET1_SIZE))
        make_face()
    revolve(axis=Axis((0, 8, -9.5), (0, 1, 0)))
    # an asymmetric fillet: 5, 0.5 mm, written as the material it takes off along each edge
    with BuildSketch(Plane(origin=(0, 18, 9.5), x_dir=(0, 0, -1), z_dir=(1, 0, 0))) as fillet1_2_piece_1:
        with BuildLine():
            Bezier((2.7, -FILLET1_SIZE), (2.7, 0), (2.7 - FILLET1_SIZE_2, 0), weights=[1, 0.707106781, 1])
            Line((2.7 - FILLET1_SIZE_2, 0), (2.7, 0))
            Line((2.7, 0), (2.7, -FILLET1_SIZE))
        make_face()
    revolve(axis=Axis((0, 18, 9.5), (0, 1, 0)), mode=Mode.SUBTRACT)


solid = part.part
